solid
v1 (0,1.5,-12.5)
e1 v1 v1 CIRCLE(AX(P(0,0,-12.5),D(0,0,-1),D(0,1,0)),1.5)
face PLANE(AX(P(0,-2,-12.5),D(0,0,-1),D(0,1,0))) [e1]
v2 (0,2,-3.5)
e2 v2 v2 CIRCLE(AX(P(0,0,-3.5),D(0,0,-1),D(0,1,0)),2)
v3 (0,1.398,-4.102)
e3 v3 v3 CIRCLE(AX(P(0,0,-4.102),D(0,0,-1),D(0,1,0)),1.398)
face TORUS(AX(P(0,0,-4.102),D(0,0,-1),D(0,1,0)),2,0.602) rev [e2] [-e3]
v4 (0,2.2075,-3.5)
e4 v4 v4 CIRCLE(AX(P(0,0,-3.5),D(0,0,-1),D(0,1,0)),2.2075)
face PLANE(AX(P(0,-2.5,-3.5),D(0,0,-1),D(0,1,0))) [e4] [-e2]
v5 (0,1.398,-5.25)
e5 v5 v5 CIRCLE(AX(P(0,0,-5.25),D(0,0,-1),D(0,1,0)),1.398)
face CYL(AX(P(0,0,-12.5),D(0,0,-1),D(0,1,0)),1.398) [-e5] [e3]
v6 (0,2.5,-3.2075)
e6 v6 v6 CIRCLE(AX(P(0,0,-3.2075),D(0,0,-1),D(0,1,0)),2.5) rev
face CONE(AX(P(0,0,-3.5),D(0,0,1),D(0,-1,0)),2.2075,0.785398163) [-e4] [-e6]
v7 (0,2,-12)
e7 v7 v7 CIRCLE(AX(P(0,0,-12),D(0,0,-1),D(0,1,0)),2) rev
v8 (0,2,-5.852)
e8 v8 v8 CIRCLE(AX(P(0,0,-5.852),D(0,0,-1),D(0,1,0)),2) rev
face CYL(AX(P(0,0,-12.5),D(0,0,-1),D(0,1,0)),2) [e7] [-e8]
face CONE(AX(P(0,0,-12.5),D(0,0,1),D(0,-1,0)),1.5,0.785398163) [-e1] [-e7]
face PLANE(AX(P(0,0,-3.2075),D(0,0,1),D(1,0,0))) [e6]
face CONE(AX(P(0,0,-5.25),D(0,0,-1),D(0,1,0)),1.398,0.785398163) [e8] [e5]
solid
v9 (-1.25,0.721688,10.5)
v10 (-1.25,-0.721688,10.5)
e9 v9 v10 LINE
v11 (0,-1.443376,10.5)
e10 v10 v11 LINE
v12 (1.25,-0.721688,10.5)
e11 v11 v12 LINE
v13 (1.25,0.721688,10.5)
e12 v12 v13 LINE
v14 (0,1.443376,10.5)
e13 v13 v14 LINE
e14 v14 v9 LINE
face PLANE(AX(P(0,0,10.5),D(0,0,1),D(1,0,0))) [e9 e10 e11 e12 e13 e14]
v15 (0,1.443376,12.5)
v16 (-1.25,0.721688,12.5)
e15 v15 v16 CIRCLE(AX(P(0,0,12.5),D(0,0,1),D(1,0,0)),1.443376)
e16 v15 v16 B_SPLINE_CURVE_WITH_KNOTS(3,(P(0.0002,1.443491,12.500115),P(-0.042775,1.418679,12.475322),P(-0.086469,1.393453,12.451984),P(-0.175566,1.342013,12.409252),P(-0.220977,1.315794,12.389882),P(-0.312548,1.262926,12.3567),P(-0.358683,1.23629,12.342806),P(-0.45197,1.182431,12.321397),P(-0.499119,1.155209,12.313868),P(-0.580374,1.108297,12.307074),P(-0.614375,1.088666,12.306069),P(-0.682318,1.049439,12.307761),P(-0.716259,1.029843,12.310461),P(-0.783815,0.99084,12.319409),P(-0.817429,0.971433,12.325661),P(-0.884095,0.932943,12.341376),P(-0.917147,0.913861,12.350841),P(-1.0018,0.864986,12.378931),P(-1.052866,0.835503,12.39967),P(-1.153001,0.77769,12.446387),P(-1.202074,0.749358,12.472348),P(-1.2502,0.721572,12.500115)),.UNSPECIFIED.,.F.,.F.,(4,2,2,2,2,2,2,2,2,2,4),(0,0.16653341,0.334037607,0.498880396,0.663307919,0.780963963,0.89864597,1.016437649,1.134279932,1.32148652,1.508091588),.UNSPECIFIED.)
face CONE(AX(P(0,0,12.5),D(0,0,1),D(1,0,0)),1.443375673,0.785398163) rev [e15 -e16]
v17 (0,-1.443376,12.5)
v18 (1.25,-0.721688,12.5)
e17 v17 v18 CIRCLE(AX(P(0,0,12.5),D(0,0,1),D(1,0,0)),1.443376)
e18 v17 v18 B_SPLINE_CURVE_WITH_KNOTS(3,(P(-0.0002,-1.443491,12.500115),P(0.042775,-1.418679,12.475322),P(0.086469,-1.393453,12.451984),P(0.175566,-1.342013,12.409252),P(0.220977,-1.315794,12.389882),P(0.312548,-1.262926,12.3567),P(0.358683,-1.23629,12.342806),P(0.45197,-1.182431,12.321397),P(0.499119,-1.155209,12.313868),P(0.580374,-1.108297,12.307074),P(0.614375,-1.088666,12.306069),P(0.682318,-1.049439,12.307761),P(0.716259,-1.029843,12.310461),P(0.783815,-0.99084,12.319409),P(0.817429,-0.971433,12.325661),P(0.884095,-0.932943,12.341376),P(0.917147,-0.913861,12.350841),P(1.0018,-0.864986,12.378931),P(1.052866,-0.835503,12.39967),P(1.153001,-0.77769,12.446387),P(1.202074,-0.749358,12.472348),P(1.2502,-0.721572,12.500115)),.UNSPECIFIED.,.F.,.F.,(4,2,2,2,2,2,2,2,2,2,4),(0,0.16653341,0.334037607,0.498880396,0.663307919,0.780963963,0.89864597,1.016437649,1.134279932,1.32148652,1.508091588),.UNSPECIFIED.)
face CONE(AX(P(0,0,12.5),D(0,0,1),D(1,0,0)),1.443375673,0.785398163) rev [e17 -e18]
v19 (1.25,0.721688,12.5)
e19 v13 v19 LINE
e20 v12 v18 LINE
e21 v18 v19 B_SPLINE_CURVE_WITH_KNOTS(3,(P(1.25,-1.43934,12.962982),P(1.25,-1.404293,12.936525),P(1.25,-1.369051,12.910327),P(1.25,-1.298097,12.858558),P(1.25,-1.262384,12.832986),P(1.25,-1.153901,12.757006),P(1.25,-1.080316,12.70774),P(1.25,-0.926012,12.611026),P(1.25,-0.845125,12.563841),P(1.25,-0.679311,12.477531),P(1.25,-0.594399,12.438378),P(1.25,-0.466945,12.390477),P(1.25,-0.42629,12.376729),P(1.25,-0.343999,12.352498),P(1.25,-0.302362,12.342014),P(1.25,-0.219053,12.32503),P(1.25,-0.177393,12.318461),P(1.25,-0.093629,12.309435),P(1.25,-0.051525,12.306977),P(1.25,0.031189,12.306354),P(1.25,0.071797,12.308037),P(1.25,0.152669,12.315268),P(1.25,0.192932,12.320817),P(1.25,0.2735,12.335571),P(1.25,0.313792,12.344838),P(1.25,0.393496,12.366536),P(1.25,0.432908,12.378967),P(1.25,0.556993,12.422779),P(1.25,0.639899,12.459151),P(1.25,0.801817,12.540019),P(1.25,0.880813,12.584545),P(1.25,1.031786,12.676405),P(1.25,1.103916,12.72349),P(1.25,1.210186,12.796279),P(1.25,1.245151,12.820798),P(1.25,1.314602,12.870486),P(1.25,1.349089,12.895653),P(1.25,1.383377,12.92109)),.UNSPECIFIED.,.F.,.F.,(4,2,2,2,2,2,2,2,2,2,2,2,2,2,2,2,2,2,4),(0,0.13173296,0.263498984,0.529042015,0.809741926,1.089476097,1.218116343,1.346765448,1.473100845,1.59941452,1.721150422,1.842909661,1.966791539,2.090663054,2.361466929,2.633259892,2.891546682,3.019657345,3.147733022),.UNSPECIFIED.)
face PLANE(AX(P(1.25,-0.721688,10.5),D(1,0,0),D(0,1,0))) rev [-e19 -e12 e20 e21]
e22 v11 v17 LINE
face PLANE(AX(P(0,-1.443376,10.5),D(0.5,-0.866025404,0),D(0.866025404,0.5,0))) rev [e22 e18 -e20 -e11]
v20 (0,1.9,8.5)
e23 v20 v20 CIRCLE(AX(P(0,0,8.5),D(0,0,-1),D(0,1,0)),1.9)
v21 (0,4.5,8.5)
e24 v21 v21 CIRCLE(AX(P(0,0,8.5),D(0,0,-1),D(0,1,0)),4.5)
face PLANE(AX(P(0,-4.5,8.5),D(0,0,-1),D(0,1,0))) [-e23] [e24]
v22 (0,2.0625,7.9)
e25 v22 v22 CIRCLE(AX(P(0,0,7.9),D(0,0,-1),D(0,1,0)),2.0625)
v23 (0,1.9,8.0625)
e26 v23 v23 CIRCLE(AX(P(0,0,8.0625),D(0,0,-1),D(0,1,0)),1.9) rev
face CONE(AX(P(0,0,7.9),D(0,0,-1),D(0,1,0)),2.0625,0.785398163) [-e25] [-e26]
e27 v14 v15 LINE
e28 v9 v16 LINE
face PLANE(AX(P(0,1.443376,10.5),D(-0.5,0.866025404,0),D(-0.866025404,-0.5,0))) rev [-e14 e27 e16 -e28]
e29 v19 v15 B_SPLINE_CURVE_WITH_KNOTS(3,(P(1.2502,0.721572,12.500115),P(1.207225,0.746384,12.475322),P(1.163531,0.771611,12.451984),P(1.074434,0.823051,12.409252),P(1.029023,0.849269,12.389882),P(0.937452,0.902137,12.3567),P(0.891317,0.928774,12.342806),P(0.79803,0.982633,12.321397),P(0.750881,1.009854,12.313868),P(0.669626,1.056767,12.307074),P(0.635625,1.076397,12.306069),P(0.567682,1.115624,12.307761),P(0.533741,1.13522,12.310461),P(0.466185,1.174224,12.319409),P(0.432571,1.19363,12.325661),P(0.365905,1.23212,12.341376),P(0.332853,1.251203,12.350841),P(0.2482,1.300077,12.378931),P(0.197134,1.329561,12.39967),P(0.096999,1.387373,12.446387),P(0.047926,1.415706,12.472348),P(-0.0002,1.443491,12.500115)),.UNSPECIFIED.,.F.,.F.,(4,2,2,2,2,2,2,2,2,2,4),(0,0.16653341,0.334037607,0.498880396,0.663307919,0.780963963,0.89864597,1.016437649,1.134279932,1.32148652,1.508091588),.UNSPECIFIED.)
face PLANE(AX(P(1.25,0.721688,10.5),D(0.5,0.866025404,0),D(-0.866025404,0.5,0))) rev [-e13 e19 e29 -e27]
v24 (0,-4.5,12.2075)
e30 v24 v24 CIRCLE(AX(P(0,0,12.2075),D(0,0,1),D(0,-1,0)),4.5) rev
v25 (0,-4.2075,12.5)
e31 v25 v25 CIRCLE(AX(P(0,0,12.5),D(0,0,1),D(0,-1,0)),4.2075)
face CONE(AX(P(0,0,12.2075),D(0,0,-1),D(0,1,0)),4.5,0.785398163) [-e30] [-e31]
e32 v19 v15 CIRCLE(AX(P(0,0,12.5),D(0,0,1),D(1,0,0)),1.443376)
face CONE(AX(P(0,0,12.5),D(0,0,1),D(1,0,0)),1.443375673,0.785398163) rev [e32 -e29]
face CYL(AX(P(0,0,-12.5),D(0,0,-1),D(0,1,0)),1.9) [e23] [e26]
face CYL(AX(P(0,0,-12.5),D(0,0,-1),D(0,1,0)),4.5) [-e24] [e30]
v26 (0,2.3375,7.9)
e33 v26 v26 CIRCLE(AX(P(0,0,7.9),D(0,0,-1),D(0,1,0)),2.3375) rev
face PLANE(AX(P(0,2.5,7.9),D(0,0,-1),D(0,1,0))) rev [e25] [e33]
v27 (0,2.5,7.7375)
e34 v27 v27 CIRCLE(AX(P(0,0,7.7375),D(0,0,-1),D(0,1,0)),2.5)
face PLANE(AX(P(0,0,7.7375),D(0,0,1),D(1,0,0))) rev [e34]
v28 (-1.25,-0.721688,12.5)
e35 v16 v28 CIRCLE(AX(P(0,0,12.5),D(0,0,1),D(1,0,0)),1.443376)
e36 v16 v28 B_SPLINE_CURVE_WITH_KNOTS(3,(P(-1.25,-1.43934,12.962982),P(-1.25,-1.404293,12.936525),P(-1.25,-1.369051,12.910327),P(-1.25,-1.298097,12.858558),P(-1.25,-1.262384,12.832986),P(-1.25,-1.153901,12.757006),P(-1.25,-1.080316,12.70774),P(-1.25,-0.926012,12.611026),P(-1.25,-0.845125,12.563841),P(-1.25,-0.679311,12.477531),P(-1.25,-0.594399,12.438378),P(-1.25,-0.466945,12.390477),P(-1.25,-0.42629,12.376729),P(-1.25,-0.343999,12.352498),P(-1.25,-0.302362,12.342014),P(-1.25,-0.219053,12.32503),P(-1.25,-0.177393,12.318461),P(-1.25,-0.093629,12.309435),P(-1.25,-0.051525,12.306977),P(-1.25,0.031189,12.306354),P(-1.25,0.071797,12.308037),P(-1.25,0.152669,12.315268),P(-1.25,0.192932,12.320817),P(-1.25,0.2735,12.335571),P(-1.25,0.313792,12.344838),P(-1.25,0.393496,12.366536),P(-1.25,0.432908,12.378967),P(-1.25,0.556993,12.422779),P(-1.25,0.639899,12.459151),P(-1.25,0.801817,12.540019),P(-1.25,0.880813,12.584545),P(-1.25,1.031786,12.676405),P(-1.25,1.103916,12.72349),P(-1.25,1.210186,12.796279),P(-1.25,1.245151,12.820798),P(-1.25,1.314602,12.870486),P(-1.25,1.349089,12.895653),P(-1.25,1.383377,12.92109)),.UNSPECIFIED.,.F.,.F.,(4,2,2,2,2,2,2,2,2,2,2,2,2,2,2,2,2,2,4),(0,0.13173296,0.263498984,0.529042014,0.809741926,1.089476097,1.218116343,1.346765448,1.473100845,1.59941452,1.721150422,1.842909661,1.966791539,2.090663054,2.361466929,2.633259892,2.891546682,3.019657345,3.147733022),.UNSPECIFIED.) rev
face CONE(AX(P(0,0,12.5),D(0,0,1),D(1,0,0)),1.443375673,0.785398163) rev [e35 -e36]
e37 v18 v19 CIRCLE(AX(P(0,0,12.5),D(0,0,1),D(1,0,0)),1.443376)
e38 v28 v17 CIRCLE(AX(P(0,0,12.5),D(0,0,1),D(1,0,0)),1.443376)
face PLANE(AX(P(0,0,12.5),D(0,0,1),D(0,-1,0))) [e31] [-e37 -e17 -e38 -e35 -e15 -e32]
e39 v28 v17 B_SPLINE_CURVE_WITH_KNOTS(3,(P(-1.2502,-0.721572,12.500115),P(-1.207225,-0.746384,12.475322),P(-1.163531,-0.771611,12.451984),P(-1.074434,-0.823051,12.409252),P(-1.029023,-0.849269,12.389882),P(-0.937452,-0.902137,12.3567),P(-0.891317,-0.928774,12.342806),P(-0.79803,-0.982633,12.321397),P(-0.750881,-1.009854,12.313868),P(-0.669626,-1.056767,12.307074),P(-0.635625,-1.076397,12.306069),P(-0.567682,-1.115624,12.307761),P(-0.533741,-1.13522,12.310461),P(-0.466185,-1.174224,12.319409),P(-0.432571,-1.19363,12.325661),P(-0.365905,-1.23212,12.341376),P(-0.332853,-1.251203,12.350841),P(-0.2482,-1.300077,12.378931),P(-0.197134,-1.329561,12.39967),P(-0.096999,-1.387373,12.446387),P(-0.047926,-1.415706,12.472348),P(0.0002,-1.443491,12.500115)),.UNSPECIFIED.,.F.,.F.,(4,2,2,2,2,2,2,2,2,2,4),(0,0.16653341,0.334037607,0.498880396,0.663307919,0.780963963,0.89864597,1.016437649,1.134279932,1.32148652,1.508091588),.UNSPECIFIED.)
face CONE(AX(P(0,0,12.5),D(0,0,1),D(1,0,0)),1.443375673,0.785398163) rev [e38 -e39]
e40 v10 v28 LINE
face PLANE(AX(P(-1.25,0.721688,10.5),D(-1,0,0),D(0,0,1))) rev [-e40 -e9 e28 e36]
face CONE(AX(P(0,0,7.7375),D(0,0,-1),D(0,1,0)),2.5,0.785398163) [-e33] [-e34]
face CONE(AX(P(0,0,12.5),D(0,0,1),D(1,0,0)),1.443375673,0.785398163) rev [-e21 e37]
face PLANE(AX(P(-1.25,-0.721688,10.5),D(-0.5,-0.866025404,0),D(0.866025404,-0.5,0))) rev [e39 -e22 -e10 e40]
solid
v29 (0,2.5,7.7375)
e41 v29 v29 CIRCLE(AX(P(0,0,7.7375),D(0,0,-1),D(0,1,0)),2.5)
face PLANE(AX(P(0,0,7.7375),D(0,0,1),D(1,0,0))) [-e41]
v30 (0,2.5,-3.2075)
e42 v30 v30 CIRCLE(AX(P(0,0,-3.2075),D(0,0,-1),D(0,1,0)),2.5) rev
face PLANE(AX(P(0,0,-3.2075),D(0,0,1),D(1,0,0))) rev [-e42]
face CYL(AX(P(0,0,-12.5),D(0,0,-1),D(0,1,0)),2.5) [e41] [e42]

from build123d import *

# Parameters (mm, degrees)
SKETCH4_W           = 0.6
SKETCH4_H           = 0.6
CHAMFER1_SIZE       = 0.1625
CHAMFER2_SIZE       = 0.5
CHAMFER3_SIZE       = 0.2925
CUT_EXTRUDE1_DEPTH  = 2
SPLIT2_START        = -3.2075
SPLIT2_OUTLINE_R    = 4.5
SPLIT2_DEPTH        = 15.7075
SPLIT2_START_2      = 10.5
SPLIT2_3_DEPTH      = 2
SPLIT2_10_OUTLINE_R = 2.5
SPLIT2_10_DEPTH     = 10.945


with BuildPart() as part:
    # Sketch3 → Revolve1 (revolve)
    with BuildSketch(Plane(origin=(0, 0, 0), x_dir=(0, 0, -1), z_dir=(1, 0, 0))):
        Polygon((-12.5, 4.5), (-8.5, 4.5), (-8.5, 2.5), (3.5, 2.5), (3.5, 2), (12.5, 2), (12.5, 0), (-12.5, 0), align=None)
    revolve(axis=Axis((0, 0, -12.5), (0, 0, 1)))

    # Sketch4 → Cut-Revolve1 (revolve, cut)
    with BuildSketch(Plane(origin=(0, 0, 0), x_dir=(0, 0, -1), z_dir=(1, 0, 0))):
        with Locations((-8.2, 2.2)):
            Rectangle(SKETCH4_W, SKETCH4_H)
    revolve(axis=Axis((0, 0, -12.5), (0, 0, 1)), mode=Mode.SUBTRACT)

    # Chamfer1
    chamfer1_edges = [part.edges().sort_by_distance(p)[0] for p in [
        (0, -1.9, 7.9),
        (0, -2.5, 7.9),
    ]]
    chamfer(chamfer1_edges, length=CHAMFER1_SIZE)

    # Sketch6 → Cut-Revolve2 (revolve, cut)
    with BuildSketch(Plane(origin=(0, 0, 0), x_dir=(0, 0, -1), z_dir=(1, 0, 0))):
        with BuildLine():
            Line((3.5, 2.5), (6.352, 2.5))
            Line((6.352, 2.5), (5.25, 1.398))
            Line((5.25, 1.398), (4.102, 1.398))
            ThreePointArc((4.102, 1.398), (3.676321718, 1.574321718), (3.5, 2))
            Line((3.5, 2), (3.5, 2.5))
        make_face()
    revolve(axis=Axis((0, 0, -12.5), (0, 0, 1)), mode=Mode.SUBTRACT)

    # Chamfer2
    chamfer2_edges = [part.edges().sort_by_distance(p)[0] for p in [
        (0, -2, -12.5),
    ]]
    chamfer(chamfer2_edges, length=CHAMFER2_SIZE)

    # Chamfer3
    chamfer3_edges = [part.edges().sort_by_distance(p)[0] for p in [
        (0, -2.5, -3.5),
        (0, -4.5, 12.5),
    ]]
    chamfer(chamfer3_edges, length=CHAMFER3_SIZE)

    # Sketch8 → Cut-Extrude1 (cut)
    with BuildSketch(Plane.XY.offset(12.5)):
        Polygon((1.25, 0.721687836), (0, 1.443375673), (-1.25, 0.721687836), (-1.25, -0.721687836), (0, -1.443375673), (1.25, -0.721687836), align=None)
    extrude(amount=-CUT_EXTRUDE1_DEPTH, mode=Mode.SUBTRACT)

    # Cut-Extrude2 cone 1 section (through the dimple's axis) → Cut-Extrude2 (revolve, cut)
    with BuildSketch(Plane(origin=(0, 0, 12.5), x_dir=(0, -1, 0), z_dir=(1, 0, 0))):
        Polygon((0, 0), (1.443375673, 0), (0, 1.443375673), align=None)
    revolve(axis=Axis((0, 0, 12.5), (0, 0, -1)), mode=Mode.SUBTRACT)

    # Split2: read off the stored shape, not the designer's step
    # Split2 outline → Split2 (cut)
    with BuildSketch(Plane.XY.offset(SPLIT2_START)):
        Circle(SPLIT2_OUTLINE_R)
    extrude(amount=SPLIT2_DEPTH, mode=Mode.SUBTRACT)


with BuildPart() as body_2:
    # Split2 2 outline → Split2 2 (revolve)
    with BuildSketch(Plane.XZ):
        Polygon((0, 12.500000022), (0, 7.7375), (2.5, 7.7375), (2.3375, 7.9), (2.0625, 7.9), (1.9, 8.0625), (1.9, 8.5), (4.5, 8.5), (4.5, 12.2075), (4.2075, 12.5), (1.443375689, 12.500000017), align=None)
    revolve(axis=Axis((0, 0, 0), (0, 0, 1)))

    # Split2 3 outline → Split2 3 (cut)
    with BuildSketch(Plane.XY.offset(SPLIT2_START_2)):
        Polygon((1.25, -0.721687836), (1.25, 0.721687836), (0, 1.443375673), (-1.25, 0.721687836), (-1.25, -0.721687836), (0, -1.443375673), align=None)
    extrude(amount=SPLIT2_3_DEPTH, mode=Mode.SUBTRACT)

    # Split2 4: loft between two sections, ruled curve by curve
    split2_4_from = [
        Edge.make_three_point_arc((1.08239615, 0.624921709, 12.306467745), (0.624921709, 1.08239615, 12.306467745), (0, 1.249843418, 12.306467745)),
        Edge.make_line((0, 1.249843418, 12.306467745), (1.08239615, 0.624921709, 12.306467745)),
    ]
    split2_4_to = [
        Edge.make_three_point_arc((1.250000029, 0.721687853, 12.500000033), (0.721687853, 1.250000029, 12.500000033), (0, 1.443375706, 12.500000033)),
        Edge.make_line((0, 1.443375706, 12.500000033), (1.250000029, 0.721687853, 12.500000033)),
    ]
    split2_4 = Solid(Shell([*[Face.make_surface_from_curves(split2_4_from[k], split2_4_to[k]) for k in range(2)], Face(Wire(split2_4_from)), Face(Wire(split2_4_to))]))
    add(split2_4, mode=Mode.SUBTRACT)

    # Split2 5: loft between two sections, ruled curve by curve
    split2_5_from = [
        Edge.make_three_point_arc((0, 1.249843418, 12.306467745), (-0.624921709, 1.08239615, 12.306467745), (-1.08239615, 0.624921709, 12.306467745)),
        Edge.make_line((-1.08239615, 0.624921709, 12.306467745), (0, 1.249843418, 12.306467745)),
    ]
    split2_5_to = [
        Edge.make_three_point_arc((0, 1.443375706, 12.500000033), (-0.721687853, 1.250000029, 12.500000033), (-1.250000029, 0.721687853, 12.500000033)),
        Edge.make_line((-1.250000029, 0.721687853, 12.500000033), (0, 1.443375706, 12.500000033)),
    ]
    split2_5 = Solid(Shell([*[Face.make_surface_from_curves(split2_5_from[k], split2_5_to[k]) for k in range(2)], Face(Wire(split2_5_from)), Face(Wire(split2_5_to))]))
    add(split2_5, mode=Mode.SUBTRACT)

    # Split2 6: loft between two sections, ruled curve by curve
    split2_6_from = [
        Edge.make_three_point_arc((-1.082395782, 0.624921515, 12.306467329), (-1.249843002, -4.66e-07, 12.306467329), (-1.082395316, -0.624922322, 12.306467329)),
        Edge.make_line((-1.082395316, -0.624922322, 12.306467329), (-1.082395782, 0.624921515, 12.306467329)),
    ]
    split2_6_to = [
        Edge.make_three_point_arc((-1.249999991, 0.721687853, 12.5), (-1.443375673, -5.38e-07, 12.5), (-1.249999452, -0.721688785, 12.5)),
        Edge.make_line((-1.249999452, -0.721688785, 12.5), (-1.249999991, 0.721687853, 12.5)),
    ]
    split2_6 = Solid(Shell([*[Face.make_surface_from_curves(split2_6_from[k], split2_6_to[k]) for k in range(2)], Face(Wire(split2_6_from)), Face(Wire(split2_6_to))]))
    add(split2_6, mode=Mode.SUBTRACT)

    # Split2 7: loft between two sections, ruled curve by curve
    split2_7_from = [
        Edge.make_three_point_arc((-1.08239615, -0.624921709, 12.306467745), (-0.624921709, -1.08239615, 12.306467745), (0, -1.249843418, 12.306467745)),
        Edge.make_line((0, -1.249843418, 12.306467745), (-1.08239615, -0.624921709, 12.306467745)),
    ]
    split2_7_to = [
        Edge.make_three_point_arc((-1.250000029, -0.721687853, 12.500000033), (-0.721687853, -1.250000029, 12.500000033), (0, -1.443375706, 12.500000033)),
        Edge.make_line((0, -1.443375706, 12.500000033), (-1.250000029, -0.721687853, 12.500000033)),
    ]
    split2_7 = Solid(Shell([*[Face.make_surface_from_curves(split2_7_from[k], split2_7_to[k]) for k in range(2)], Face(Wire(split2_7_from)), Face(Wire(split2_7_to))]))
    add(split2_7, mode=Mode.SUBTRACT)

    # Split2 8: loft between two sections, ruled curve by curve
    split2_8_from = [
        Edge.make_three_point_arc((0, -1.249843418, 12.306467745), (0.624921709, -1.08239615, 12.306467745), (1.08239615, -0.624921709, 12.306467745)),
        Edge.make_line((1.08239615, -0.624921709, 12.306467745), (0, -1.249843418, 12.306467745)),
    ]
    split2_8_to = [
        Edge.make_three_point_arc((0, -1.443375706, 12.500000033), (0.721687853, -1.250000029, 12.500000033), (1.250000029, -0.721687853, 12.500000033)),
        Edge.make_line((1.250000029, -0.721687853, 12.500000033), (0, -1.443375706, 12.500000033)),
    ]
    split2_8 = Solid(Shell([*[Face.make_surface_from_curves(split2_8_from[k], split2_8_to[k]) for k in range(2)], Face(Wire(split2_8_from)), Face(Wire(split2_8_to))]))
    add(split2_8, mode=Mode.SUBTRACT)

    # Split2 9: loft between two sections, ruled curve by curve
    split2_9_from = [
        Edge.make_three_point_arc((1.082395316, -0.624922322, 12.306467329), (1.249843002, -4.66e-07, 12.306467329), (1.082395782, 0.624921515, 12.306467329)),
        Edge.make_line((1.082395782, 0.624921515, 12.306467329), (1.082395316, -0.624922322, 12.306467329)),
    ]
    split2_9_to = [
        Edge.make_three_point_arc((1.249999452, -0.721688785, 12.5), (1.443375673, -5.38e-07, 12.5), (1.249999991, 0.721687853, 12.5)),
        Edge.make_line((1.249999991, 0.721687853, 12.5), (1.249999452, -0.721688785, 12.5)),
    ]
    split2_9 = Solid(Shell([*[Face.make_surface_from_curves(split2_9_from[k], split2_9_to[k]) for k in range(2)], Face(Wire(split2_9_from)), Face(Wire(split2_9_to))]))
    add(split2_9, mode=Mode.SUBTRACT)


with BuildPart() as body_3:
    # Split2 10 outline → Split2 10 (new body)
    with BuildSketch(Plane.XY.offset(SPLIT2_START)):
        Circle(SPLIT2_10_OUTLINE_R)
    extrude(amount=SPLIT2_10_DEPTH)


solid = Compound([part.part, body_2.part, body_3.part])
